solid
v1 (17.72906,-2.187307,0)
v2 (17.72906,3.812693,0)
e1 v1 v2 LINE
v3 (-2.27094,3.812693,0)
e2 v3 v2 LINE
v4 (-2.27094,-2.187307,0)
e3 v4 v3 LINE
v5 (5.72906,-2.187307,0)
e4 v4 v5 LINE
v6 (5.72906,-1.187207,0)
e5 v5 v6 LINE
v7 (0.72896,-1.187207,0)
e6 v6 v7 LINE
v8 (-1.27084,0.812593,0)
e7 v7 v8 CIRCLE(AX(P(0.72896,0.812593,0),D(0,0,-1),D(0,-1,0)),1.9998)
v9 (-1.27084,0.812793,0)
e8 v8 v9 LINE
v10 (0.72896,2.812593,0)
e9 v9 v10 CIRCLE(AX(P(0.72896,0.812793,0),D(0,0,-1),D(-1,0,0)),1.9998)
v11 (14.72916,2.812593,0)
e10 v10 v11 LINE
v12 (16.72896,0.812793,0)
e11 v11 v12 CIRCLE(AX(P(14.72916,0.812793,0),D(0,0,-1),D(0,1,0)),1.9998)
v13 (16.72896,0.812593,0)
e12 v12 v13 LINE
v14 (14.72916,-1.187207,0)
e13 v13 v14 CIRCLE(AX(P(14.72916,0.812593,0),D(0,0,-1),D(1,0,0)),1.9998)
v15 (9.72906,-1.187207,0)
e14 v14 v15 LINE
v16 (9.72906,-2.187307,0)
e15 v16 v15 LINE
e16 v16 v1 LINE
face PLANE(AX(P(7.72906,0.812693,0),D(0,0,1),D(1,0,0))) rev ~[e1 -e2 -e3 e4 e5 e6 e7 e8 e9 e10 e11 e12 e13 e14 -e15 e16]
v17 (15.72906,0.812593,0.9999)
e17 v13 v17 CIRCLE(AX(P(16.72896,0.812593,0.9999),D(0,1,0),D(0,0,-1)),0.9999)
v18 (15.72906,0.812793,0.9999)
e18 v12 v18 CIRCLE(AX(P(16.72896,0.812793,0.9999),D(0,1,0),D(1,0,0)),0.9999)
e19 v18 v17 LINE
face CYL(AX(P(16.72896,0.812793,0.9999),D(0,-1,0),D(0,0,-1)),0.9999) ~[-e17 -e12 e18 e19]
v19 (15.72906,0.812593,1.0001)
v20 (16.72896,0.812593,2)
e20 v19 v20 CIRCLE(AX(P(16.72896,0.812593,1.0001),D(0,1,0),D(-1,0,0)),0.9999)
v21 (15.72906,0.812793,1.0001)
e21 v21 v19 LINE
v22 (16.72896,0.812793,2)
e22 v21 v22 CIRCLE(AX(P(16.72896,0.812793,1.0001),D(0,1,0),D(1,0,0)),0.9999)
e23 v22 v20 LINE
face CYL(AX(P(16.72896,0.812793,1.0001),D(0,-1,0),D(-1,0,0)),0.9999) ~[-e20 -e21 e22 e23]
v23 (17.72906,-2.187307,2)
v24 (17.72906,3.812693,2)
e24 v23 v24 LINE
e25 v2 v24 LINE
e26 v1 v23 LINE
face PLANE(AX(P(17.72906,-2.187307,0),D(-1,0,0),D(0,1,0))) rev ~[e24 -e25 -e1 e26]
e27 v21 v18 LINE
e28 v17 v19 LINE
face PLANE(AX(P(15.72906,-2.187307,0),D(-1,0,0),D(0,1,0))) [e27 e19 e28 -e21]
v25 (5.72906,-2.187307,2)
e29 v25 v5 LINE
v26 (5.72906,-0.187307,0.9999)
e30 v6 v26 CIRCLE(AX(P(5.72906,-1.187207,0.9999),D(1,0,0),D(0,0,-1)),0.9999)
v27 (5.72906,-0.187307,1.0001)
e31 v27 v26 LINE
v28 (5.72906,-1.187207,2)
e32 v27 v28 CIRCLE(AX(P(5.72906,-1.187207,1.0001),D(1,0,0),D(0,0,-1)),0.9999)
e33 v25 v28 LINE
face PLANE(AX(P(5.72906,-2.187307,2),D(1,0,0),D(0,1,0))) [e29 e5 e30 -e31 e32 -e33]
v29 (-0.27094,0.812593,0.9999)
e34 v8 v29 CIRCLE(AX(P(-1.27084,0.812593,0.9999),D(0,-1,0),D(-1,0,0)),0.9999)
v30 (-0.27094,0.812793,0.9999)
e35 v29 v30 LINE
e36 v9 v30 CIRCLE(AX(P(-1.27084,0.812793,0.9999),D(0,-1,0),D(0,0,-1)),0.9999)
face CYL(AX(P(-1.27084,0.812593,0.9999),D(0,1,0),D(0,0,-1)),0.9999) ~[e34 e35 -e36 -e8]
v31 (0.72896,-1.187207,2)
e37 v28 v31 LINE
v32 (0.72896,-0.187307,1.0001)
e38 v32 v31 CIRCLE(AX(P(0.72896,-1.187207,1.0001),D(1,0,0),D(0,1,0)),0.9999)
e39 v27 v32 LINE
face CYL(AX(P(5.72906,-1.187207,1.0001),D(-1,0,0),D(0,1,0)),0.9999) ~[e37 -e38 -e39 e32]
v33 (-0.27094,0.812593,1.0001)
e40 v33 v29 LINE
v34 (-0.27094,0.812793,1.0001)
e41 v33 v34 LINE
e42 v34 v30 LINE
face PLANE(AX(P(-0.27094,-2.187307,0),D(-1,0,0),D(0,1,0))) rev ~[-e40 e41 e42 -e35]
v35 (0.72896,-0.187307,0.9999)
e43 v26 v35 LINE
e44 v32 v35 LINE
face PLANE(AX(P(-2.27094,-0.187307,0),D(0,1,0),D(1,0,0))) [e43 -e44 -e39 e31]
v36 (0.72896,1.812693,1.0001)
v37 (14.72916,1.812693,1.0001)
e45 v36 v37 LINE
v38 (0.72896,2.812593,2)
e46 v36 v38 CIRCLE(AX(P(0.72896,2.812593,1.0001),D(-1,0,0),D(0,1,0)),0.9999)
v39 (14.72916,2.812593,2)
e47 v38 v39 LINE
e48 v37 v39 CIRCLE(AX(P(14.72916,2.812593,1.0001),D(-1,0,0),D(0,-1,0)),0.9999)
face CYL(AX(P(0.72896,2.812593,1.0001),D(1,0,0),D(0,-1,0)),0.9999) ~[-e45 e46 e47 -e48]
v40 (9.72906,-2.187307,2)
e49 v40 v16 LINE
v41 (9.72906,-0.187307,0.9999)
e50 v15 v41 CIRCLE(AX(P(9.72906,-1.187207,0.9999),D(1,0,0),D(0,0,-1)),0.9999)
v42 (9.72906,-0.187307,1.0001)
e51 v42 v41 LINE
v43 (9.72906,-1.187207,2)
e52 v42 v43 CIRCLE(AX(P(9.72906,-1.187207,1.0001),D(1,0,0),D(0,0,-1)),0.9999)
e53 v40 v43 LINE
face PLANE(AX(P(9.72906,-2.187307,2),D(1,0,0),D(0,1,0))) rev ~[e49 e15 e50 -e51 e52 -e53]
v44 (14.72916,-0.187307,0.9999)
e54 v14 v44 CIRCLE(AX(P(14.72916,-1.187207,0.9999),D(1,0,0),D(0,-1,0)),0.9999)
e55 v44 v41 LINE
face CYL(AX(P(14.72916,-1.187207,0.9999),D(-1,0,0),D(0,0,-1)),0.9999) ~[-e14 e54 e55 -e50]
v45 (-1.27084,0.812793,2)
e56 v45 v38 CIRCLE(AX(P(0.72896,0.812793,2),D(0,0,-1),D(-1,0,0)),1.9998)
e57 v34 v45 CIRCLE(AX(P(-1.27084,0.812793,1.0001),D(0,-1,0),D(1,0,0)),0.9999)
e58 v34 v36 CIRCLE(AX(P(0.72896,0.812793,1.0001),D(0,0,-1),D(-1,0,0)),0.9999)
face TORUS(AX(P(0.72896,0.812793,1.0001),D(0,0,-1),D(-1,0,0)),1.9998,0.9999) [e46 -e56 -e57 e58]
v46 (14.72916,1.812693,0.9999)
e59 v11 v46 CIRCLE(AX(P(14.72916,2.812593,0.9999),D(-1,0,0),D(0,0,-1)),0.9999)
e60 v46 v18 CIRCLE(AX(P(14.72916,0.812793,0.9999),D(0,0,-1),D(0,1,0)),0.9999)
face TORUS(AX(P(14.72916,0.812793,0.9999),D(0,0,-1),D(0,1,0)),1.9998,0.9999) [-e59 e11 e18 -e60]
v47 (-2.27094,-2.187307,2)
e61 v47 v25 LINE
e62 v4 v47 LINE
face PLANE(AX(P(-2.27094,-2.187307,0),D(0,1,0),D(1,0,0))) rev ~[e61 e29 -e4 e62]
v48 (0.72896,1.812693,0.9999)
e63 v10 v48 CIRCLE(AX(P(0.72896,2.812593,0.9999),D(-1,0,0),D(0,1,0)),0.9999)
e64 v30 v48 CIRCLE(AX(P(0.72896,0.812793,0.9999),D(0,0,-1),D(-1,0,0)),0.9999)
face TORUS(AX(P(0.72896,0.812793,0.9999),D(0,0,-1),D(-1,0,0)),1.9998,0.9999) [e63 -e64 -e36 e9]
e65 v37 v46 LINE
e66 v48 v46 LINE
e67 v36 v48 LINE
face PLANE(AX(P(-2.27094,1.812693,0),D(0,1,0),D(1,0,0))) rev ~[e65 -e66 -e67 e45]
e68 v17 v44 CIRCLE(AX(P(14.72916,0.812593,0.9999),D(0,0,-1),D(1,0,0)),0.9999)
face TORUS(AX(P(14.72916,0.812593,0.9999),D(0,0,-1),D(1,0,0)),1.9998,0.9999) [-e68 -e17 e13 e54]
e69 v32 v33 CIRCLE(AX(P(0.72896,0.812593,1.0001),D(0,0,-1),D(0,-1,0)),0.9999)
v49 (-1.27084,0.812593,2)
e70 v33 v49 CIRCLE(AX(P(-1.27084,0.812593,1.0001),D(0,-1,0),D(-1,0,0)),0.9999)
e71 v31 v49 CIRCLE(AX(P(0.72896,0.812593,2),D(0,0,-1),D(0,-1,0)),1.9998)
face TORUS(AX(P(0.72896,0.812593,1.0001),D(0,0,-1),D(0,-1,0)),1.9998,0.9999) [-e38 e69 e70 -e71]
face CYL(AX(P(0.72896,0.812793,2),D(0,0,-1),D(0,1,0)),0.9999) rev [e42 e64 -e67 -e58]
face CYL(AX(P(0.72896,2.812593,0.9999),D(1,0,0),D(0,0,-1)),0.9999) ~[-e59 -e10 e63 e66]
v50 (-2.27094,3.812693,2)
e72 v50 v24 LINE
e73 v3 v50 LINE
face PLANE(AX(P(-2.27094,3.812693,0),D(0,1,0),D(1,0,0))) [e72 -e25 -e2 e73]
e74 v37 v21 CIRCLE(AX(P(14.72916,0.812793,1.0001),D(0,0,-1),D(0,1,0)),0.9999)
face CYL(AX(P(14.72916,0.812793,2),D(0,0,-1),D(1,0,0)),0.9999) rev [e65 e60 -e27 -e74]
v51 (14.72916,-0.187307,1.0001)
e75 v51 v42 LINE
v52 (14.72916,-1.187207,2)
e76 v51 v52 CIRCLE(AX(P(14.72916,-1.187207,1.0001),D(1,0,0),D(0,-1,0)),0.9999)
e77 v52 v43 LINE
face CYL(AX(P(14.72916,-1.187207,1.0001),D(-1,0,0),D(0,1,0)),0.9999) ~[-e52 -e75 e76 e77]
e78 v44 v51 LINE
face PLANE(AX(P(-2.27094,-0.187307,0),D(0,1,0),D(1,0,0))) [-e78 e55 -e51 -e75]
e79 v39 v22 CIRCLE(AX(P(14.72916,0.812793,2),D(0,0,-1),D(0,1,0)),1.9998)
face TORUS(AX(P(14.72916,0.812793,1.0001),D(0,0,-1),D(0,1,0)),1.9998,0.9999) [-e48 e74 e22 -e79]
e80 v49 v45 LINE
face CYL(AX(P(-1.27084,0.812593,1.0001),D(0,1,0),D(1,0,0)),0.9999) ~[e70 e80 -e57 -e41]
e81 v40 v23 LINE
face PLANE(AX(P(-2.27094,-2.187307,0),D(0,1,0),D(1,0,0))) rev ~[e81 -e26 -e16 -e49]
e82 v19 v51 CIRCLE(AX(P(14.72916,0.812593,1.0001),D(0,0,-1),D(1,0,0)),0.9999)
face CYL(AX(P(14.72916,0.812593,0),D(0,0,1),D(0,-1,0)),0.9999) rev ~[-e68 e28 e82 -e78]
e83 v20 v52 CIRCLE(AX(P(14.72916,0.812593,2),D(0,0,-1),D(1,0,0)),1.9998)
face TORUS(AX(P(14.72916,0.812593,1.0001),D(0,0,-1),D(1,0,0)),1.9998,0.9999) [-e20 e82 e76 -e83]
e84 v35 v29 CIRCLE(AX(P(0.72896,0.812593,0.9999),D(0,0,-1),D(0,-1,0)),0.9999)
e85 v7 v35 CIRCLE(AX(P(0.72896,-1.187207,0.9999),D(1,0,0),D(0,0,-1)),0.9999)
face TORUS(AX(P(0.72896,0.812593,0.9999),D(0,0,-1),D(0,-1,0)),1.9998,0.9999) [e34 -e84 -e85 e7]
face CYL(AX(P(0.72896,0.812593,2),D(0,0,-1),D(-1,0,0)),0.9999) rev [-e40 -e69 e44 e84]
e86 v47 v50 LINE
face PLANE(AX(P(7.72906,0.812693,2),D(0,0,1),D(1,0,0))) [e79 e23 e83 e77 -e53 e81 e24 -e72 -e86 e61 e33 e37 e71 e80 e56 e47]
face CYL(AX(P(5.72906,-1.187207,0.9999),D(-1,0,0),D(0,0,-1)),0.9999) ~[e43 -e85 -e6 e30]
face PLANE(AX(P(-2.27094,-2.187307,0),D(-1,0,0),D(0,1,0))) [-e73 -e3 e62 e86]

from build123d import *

# Parameters (mm, degrees)
F0_W     = 20
F0_H     = 6
F1_DEPTH = 2
F2_T     = -2
F3_W     = 4
F3_H     = 2
F4_DEPTH = 25
F5_F1_R  = 0.9999
F5_F2_R  = 0.9999


# Not quite as in the source:
# - a fillet or chamfer is up to 0.001 mm smaller than in the source, because OpenCascade refuses the exact size


with BuildPart() as f1:
    # F0 (on Top) → F1 (new body)
    with BuildSketch(Plane.XY):
        with Locations((7.7290598062, 0.812693499)):
            Rectangle(F0_W, F0_H)
    extrude(amount=F1_DEPTH)

    # F2
    f2_openings = [f1.faces().sort_by_distance(p)[0] for p in [
        (7.72906, 0.812693, 2),
        (7.72906, 0.812693, 0),
    ]]
    offset(amount=F2_T, openings=f2_openings)

    # F3 (on face) → F4 (cut)
    with BuildSketch(Plane.XY.offset(2)):
        with Locations((7.7290598062, -1.187306501)):
            Rectangle(F3_W, F3_H)
    extrude(amount=-F4_DEPTH, mode=Mode.SUBTRACT)

    # F5: fillet of radius 1 on 8 edges, made by hand

    # F5_f1 (radius 1 in the source; OpenCascade refuses exactly that, so slightly less here)
    f5_f1_edges = [f1.edges().sort_by_distance(p)[0] for p in [
        (-0.2709401938, 1.812693499, 1),
        (-0.2709401938, -0.187306501, 1),
        (15.7290598062, -0.187306501, 1),
        (15.7290598062, 1.812693499, 1),
    ]]
    fillet(f5_f1_edges, radius=F5_F1_R)

    # F5_f2 (radius 1 in the source; OpenCascade refuses exactly that, so slightly less here)
    f5_f2_edges = [f1.edges().sort_by_distance(p)[0] for p in [
        (-0.2709401938, 0.812693499, 0),
        (-0.2709401938, 0.812693499, 2),
        (15.7290598062, 0.812693499, 0),
        (15.7290598062, 0.812693499, 2),
        (15.4361958767, 0.1055574285, 2),
        (15.4361958767, 1.5198295695, 2),
        (15.4361958767, 0.1055574285, 0),
        (15.4361958767, 1.5198295695, 0),
        (0.0219237357, 1.5198295695, 2),
        (0.0219237357, 0.1055574285, 2),
        (0.0219237357, 1.5198295695, 0),
        (0.0219237357, 0.1055574285, 0),
    ]]
    fillet(f5_f2_edges, radius=F5_F2_R)


solid = f1.part
